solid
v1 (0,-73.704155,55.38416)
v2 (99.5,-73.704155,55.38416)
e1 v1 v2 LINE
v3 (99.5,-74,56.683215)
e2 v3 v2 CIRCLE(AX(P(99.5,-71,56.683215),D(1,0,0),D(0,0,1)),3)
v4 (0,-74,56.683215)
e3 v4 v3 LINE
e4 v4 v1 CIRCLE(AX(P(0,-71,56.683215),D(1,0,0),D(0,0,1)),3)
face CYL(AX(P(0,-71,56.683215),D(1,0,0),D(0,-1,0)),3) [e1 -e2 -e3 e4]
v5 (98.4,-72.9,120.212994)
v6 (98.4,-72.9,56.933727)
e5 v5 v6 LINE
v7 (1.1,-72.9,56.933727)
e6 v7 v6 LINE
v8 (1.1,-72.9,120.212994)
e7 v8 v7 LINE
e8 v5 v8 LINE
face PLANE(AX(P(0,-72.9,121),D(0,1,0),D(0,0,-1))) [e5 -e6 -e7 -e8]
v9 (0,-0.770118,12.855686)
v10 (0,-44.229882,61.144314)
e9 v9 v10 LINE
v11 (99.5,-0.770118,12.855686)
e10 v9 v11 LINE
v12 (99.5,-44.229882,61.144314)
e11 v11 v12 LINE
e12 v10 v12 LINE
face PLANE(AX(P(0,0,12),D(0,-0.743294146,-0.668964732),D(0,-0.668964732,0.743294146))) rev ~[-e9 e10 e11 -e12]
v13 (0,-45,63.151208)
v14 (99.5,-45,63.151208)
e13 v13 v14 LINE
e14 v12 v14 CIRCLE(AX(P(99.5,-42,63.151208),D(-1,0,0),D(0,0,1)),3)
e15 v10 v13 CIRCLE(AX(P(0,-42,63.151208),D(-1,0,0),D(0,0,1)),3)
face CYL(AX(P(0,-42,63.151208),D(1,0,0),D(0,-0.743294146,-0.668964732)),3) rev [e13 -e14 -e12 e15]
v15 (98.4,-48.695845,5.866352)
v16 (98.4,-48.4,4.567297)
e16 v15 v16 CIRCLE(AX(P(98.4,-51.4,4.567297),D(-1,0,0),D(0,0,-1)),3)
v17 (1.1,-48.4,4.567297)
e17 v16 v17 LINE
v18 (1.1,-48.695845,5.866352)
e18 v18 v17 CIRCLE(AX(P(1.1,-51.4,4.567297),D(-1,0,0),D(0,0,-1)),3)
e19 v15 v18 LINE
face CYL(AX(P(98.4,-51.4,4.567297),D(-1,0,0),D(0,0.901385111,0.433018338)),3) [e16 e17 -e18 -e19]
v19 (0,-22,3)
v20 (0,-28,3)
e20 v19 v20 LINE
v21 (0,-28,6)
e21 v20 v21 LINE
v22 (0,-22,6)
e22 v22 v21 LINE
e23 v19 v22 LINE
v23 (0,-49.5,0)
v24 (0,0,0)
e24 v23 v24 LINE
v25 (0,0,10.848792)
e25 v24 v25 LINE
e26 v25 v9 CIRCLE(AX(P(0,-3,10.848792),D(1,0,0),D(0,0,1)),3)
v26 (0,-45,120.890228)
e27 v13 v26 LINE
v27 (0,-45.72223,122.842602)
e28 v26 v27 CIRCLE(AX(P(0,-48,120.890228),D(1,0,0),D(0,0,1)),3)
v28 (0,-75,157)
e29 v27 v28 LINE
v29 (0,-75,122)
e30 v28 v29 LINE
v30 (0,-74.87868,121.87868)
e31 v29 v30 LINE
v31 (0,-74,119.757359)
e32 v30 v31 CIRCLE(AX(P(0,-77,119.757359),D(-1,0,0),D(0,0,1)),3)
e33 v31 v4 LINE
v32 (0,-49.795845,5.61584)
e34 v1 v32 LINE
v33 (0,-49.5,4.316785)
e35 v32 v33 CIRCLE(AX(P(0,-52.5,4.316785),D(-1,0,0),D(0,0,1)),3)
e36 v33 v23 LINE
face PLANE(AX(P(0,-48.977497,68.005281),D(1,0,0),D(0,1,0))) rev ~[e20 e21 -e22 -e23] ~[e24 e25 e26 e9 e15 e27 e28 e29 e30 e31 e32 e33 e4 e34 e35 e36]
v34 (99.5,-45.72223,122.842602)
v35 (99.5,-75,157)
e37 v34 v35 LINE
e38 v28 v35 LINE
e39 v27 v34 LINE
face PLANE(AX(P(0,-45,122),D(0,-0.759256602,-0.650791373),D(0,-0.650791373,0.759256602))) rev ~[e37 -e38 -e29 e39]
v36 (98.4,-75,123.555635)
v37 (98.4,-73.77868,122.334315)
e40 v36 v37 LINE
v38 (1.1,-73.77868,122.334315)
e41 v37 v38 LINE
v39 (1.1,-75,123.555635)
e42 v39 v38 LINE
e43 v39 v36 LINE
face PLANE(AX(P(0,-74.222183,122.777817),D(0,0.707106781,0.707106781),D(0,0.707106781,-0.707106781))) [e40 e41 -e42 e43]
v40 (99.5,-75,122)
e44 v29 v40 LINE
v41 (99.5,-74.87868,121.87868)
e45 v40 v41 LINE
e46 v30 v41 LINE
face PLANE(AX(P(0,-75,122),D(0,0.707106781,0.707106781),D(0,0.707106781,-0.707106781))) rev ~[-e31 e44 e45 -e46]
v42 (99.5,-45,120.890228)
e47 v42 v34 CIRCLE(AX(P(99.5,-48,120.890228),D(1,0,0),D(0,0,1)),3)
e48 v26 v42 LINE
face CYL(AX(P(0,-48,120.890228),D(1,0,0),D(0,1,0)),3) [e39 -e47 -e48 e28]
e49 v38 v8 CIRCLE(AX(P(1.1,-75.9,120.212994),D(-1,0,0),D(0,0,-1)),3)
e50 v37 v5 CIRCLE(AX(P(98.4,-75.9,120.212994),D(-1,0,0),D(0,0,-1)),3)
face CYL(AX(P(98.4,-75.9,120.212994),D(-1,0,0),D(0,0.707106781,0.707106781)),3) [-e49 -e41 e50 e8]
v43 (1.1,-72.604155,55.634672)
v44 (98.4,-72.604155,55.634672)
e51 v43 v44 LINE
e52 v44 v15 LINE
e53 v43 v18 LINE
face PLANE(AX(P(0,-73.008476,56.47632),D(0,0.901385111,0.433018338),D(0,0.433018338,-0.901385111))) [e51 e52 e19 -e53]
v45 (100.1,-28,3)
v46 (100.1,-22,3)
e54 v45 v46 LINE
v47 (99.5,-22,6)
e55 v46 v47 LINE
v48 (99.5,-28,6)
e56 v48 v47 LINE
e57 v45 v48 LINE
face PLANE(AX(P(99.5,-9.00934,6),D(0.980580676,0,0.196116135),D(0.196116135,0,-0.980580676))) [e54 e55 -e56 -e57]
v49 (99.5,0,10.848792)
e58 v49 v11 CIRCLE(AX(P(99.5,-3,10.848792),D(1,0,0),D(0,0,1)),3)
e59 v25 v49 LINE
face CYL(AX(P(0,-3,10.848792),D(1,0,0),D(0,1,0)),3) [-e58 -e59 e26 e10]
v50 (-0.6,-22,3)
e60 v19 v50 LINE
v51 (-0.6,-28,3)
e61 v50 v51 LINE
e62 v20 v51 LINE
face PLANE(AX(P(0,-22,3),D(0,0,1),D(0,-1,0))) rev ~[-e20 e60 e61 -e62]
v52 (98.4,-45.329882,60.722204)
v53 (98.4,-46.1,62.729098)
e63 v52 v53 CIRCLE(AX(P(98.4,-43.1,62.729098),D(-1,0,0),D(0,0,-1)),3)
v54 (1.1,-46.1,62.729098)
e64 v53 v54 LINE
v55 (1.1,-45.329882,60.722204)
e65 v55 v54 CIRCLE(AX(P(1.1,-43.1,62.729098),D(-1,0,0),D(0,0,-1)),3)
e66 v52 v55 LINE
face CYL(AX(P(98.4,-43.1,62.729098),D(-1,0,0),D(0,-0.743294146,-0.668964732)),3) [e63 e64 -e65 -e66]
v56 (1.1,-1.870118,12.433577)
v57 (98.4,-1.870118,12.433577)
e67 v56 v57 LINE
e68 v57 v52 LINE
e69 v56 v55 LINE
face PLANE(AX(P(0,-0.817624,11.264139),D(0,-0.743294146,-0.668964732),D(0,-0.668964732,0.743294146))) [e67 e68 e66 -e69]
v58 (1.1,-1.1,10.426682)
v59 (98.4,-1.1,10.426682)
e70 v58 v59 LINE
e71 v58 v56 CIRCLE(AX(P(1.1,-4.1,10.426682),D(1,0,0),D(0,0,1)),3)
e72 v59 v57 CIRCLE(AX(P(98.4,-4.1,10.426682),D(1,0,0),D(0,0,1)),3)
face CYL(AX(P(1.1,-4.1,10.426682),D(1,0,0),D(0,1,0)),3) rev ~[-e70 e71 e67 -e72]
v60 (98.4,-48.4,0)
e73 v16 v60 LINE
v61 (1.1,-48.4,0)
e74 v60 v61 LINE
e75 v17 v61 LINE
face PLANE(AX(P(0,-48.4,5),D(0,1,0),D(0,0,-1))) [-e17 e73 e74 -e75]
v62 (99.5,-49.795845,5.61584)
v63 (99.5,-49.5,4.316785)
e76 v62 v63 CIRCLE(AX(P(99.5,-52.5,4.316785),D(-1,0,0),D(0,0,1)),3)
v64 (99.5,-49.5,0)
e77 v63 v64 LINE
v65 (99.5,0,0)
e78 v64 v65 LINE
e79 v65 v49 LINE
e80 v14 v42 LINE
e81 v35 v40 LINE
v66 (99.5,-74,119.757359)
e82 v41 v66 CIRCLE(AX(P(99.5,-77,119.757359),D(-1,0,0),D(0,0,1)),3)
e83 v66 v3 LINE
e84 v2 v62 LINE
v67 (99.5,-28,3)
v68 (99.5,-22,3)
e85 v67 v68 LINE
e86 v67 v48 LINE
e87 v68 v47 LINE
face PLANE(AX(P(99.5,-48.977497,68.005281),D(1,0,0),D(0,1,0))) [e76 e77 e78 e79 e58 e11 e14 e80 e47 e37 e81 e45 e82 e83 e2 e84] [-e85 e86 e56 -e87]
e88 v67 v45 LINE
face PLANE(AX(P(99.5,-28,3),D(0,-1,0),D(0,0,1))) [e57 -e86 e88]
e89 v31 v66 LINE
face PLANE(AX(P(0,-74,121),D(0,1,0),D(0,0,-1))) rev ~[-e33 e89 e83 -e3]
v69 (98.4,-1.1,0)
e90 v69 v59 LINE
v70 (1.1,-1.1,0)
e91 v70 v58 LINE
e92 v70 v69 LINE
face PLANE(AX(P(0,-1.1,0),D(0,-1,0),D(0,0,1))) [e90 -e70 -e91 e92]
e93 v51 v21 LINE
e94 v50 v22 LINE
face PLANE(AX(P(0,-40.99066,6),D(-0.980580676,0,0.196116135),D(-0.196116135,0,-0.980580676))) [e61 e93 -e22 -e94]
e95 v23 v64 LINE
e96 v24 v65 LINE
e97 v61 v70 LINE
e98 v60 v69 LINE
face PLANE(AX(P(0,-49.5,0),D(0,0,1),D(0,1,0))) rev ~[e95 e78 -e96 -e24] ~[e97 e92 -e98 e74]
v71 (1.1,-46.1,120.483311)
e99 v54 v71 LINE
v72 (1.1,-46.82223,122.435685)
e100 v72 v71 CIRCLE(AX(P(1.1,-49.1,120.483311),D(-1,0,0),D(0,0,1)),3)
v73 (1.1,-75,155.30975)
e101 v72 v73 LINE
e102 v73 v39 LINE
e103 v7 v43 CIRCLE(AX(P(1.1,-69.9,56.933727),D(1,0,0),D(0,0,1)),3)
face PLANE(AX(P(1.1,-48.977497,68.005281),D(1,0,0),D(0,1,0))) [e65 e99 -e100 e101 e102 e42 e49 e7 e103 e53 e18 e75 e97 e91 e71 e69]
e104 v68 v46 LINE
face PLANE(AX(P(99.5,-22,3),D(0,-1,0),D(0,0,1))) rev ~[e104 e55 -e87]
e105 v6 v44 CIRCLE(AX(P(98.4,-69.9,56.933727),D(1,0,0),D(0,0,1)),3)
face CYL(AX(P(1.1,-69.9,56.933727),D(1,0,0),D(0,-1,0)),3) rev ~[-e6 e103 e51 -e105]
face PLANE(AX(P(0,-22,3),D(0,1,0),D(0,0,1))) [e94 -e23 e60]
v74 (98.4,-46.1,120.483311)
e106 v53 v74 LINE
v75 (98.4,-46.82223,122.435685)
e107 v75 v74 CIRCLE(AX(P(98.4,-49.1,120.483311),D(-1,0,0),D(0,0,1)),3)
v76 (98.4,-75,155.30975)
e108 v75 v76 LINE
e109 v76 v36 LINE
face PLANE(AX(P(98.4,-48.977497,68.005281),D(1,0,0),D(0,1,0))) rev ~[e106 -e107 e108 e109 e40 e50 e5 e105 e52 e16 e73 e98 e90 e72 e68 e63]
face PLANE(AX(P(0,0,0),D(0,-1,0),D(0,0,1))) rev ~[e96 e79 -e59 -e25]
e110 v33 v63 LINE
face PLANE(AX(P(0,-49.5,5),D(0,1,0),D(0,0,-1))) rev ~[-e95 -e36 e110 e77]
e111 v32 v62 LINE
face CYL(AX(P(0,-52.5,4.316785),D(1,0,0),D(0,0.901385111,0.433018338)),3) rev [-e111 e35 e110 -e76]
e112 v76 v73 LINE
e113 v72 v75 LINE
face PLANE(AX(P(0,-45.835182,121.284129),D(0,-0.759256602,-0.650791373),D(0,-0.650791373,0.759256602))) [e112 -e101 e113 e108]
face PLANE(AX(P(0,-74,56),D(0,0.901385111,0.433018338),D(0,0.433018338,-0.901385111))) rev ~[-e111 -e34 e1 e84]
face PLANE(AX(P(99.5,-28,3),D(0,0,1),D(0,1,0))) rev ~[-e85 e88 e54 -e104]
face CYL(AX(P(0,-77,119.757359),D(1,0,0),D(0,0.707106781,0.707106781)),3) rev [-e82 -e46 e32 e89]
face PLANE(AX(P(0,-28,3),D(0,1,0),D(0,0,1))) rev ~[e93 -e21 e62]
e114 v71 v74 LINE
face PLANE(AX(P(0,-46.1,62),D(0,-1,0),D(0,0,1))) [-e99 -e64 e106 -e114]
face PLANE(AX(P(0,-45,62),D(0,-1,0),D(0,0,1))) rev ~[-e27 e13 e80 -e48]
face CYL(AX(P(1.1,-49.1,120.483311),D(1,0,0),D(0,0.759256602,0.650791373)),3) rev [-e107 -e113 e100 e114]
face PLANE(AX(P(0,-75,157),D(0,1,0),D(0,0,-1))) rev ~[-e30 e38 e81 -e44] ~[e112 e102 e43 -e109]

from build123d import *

# Parameters (mm, degrees)
F1_DEPTH    = 99.5
F2_T        = -1.1
F3_R        = 3
F4_W        = 6
F4_H        = 3
F5_DEPTH    = 1
F6_T4_DEPTH = 31.981320863
F7_W        = 6
F7_H        = 3
F8_DEPTH    = 1
F9_T4_DEPTH = 31.981320863


# Not quite as in the source:
# - a fillet or chamfer that OpenCascade refuses, or shapes differently, is made with other operations: its cross-section is extruded or revolved along the edge and cut away or added


with BuildPart() as f1:
    # F0 (on Right) → F1 (new body)
    with BuildSketch(Plane.YZ):
        Polygon((-49.5, 0), (0, 0), (0, 12), (-45, 62), (-45, 122), (-75, 157), (-75, 122), (-74, 121), (-74, 56), (-49.5, 5), align=None)
    extrude(amount=F1_DEPTH)

    # F2
    f2_openings = [f1.faces().sort_by_distance(p)[0] for p in [
        (49.75, -75, 139.5),
        (49.75, -24.75, 0),
    ]]
    offset(amount=F2_T, openings=f2_openings, kind=Kind.INTERSECTION)

    # F3
    f3_edges = [f1.edges().sort_by_distance(p)[0] for p in [
        (49.75, -74, 121),
        (49.75, -74, 56),
        (49.75, -49.5, 5),
        (49.75, 0, 12),
        (49.75, -45, 62),
        (49.75, -45, 122),
        (49.75, -1.1, 11.57789),
        (49.75, -46.1, 61.57789),
        (49.75, -72.9, 56.250512),
        (49.75, -46.1, 121.593084),
        (49.75, -72.9, 121.455635),
        (49.75, -48.4, 5.250512),
    ]]
    fillet(f3_edges, radius=F3_R)

    # F4 (on face) → F5 (join)
    with BuildSketch(Plane(origin=(0, 0, 0), x_dir=(0, -1, 0), z_dir=(-1, 0, 0))):
        with Locations((25, 4.5)):
            Rectangle(F4_W, F4_H)
    extrude(amount=F5_DEPTH)

    # F6: chamfer of 1 x 5 on 1 edges, made by hand


with BuildPart() as f6_tool2:
    # F6_s3 → F6_t4 (new body)
    with BuildSketch(Plane.XZ.offset(40.9906604315)):
        Polygon((0, 6), (-1, 1), (-1, 6), align=None)
    extrude(amount=-F6_T4_DEPTH)

    split(bisect_by=Plane.YZ, keep=Keep.BOTTOM)


with BuildPart() as f1_1:
    add(f1.part)

    # F6_t1: cut F6_tool2
    add(f6_tool2.part, mode=Mode.SUBTRACT)

    # F7 (on face) → F8 (join)
    with BuildSketch(Plane.YZ.offset(99.5)):
        with Locations((-25, 4.5)):
            Rectangle(F7_W, F7_H)
    extrude(amount=F8_DEPTH)

    # F9: chamfer of 1 x 5 on 1 edges, made by hand


with BuildPart() as f9_tool2:
    # F9_s3 → F9_t4 (new body)
    with BuildSketch(Plane.XZ.offset(9.0093395685)):
        Polygon((99.5, 6), (100.5, 1), (100.5, 6), align=None)
    extrude(amount=F9_T4_DEPTH)

    split(bisect_by=Plane.YZ.offset(99.5), keep=Keep.TOP)


with BuildPart() as f1_2:
    add(f1_1.part)

    # F9_t1: cut F9_tool2
    add(f9_tool2.part, mode=Mode.SUBTRACT)


solid = f1_2.part
